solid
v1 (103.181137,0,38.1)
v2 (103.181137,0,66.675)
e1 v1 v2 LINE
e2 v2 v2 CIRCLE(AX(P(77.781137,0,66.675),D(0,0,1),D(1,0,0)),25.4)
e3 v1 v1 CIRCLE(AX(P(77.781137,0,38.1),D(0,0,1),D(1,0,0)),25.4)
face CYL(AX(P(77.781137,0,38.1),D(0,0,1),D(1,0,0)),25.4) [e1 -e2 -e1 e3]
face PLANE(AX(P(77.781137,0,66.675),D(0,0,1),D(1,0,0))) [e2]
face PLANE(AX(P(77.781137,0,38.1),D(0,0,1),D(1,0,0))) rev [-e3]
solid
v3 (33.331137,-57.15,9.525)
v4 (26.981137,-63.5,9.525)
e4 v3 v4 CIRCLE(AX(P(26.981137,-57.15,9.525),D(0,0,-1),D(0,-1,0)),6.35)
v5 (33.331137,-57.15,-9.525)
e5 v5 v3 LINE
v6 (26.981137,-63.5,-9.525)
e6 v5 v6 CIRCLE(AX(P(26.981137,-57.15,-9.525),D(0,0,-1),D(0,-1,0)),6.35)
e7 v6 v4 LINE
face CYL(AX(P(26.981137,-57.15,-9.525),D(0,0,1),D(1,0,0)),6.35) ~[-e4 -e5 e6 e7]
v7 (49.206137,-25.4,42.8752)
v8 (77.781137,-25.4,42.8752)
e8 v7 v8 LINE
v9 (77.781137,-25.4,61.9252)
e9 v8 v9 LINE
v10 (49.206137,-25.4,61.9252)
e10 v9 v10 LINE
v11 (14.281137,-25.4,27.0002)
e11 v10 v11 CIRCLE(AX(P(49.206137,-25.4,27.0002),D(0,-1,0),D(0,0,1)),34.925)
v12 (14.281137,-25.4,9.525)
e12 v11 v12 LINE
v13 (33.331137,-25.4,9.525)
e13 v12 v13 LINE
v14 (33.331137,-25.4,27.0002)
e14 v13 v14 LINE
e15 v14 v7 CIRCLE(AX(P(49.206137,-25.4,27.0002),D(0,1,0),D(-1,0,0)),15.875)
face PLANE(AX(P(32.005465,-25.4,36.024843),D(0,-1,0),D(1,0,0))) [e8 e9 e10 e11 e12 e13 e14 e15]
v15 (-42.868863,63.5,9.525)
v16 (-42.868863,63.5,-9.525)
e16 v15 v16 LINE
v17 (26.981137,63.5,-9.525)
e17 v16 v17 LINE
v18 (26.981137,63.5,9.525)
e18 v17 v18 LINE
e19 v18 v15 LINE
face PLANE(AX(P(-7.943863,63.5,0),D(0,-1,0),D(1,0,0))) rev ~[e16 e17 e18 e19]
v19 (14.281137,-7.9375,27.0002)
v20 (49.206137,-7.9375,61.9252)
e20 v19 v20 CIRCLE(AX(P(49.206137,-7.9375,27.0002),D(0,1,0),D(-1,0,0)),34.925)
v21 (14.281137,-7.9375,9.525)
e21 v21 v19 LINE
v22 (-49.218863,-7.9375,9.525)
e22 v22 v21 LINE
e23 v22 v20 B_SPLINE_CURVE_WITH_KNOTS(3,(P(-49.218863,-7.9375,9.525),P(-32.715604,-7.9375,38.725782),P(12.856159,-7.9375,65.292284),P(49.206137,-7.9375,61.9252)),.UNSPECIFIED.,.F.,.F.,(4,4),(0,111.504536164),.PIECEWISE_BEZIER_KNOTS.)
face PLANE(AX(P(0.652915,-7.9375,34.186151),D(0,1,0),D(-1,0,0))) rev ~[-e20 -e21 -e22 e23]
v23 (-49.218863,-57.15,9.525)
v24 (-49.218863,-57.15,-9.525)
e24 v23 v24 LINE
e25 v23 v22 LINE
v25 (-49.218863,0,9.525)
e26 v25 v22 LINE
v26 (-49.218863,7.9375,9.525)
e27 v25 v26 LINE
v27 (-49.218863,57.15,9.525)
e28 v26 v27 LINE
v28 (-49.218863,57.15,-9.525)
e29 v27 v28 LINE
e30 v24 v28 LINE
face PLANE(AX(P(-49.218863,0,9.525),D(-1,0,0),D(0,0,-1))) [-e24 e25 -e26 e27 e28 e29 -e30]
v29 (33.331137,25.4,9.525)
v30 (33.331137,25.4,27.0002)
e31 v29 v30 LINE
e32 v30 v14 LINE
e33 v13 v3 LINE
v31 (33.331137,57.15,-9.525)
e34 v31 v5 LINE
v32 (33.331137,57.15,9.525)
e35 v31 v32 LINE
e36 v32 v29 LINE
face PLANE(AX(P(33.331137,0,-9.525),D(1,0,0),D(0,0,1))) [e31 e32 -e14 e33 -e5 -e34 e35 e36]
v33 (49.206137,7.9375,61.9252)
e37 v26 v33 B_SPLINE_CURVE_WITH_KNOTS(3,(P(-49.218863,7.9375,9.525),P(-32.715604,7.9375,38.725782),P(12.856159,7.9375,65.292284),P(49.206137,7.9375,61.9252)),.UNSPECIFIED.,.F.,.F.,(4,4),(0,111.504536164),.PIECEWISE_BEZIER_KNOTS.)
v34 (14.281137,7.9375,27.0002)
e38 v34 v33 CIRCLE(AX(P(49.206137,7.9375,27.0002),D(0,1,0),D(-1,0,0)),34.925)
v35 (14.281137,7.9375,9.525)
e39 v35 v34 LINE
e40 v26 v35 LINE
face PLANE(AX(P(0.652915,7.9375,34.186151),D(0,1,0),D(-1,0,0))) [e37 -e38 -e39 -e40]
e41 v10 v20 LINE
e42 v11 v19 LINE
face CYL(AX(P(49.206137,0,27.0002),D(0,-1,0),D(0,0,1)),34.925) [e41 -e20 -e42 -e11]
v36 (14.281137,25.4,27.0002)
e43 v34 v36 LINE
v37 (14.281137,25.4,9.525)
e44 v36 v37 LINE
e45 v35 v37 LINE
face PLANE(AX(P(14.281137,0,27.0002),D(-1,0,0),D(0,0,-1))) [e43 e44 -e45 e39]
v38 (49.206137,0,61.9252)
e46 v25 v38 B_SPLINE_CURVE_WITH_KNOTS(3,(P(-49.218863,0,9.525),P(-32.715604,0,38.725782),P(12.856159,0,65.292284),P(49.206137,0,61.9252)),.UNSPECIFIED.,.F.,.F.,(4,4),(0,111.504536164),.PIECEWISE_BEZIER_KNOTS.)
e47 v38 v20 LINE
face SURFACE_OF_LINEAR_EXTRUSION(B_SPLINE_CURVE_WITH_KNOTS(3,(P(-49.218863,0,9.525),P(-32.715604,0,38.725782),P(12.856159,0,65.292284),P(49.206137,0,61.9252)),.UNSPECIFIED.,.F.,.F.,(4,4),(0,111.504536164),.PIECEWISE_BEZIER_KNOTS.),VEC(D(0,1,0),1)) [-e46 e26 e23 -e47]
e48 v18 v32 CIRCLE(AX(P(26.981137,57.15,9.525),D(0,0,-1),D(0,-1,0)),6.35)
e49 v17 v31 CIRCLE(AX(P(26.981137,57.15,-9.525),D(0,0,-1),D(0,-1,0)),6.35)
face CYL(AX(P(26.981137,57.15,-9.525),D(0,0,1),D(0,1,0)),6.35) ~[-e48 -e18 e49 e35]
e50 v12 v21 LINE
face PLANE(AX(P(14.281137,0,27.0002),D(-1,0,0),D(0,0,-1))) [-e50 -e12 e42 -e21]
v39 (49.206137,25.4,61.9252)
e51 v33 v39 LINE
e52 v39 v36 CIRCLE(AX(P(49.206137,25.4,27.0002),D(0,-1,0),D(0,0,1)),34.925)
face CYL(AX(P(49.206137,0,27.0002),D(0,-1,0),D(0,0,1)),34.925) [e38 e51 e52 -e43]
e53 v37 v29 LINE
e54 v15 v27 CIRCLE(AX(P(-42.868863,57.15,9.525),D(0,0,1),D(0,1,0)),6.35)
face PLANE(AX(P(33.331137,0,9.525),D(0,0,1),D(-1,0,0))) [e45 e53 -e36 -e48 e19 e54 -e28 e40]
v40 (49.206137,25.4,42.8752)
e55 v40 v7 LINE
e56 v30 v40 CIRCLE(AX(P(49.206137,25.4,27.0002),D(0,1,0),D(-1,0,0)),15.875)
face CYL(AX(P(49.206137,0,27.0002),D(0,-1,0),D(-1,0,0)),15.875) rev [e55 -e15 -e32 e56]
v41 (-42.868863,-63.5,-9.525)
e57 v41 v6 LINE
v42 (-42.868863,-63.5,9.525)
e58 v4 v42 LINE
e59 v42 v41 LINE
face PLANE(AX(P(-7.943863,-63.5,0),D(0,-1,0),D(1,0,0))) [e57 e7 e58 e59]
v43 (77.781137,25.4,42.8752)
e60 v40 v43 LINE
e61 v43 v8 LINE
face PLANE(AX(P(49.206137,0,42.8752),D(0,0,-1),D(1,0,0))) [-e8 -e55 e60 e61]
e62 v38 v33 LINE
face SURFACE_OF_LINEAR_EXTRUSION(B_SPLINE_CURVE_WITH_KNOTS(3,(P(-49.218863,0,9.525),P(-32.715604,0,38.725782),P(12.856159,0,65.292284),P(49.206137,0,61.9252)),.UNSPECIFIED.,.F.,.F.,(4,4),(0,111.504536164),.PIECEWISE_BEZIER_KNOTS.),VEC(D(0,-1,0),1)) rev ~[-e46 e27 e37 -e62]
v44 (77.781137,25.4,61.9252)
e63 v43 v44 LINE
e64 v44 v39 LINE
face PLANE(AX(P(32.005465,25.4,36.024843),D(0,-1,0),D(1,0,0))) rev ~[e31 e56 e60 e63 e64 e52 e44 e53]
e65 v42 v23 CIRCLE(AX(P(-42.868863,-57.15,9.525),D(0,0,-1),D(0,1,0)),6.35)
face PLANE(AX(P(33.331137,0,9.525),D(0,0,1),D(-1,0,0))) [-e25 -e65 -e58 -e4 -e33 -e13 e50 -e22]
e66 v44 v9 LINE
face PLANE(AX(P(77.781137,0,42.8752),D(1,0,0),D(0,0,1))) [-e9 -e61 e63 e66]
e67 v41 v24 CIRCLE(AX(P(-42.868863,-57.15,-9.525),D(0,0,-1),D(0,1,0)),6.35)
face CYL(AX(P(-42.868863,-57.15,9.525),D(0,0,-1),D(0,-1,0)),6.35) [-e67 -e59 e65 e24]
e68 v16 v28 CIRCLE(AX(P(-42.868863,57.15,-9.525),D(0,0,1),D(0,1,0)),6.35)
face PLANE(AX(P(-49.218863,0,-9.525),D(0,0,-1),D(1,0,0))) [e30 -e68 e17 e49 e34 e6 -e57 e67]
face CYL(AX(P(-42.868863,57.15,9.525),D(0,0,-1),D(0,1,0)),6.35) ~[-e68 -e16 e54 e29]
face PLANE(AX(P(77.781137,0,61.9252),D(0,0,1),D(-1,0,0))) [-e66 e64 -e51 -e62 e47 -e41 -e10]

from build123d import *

# Parameters (mm, degrees)
F1_DEPTH = 63.5
F0_W     = 25.4
F0_H     = 19.05
F2_DEPTH = 25.4
F3_DEPTH = 7.9375
F5_R     = 6.35


with BuildPart() as f1:
    # F0 (on Front) → F1 (new body, symmetric)
    with BuildSketch(Plane.XZ):
        Polygon((-49.2188632803, -9.525), (33.3311367197, -9.525), (33.3311367197, 9.525), (14.2811367197, 9.525), (-49.2188632803, 9.525), align=None)
    extrude(amount=F1_DEPTH, both=True)

    # F0 (on Front) → F2 (join, symmetric)
    with BuildSketch(Plane.XZ):
        with BuildLine():
            Line((14.2811367197, 9.525), (33.3311367197, 9.525))
            Line((33.3311367197, 9.525), (33.3311367197, 27.0002))
            ThreePointArc((33.3311367197, 27.0002), (37.9808165684, 38.2255201513), (49.2061367197, 42.8752))
            Line((49.2061367197, 42.8752), (52.3811367197, 42.8752))
            Line((52.3811367197, 42.8752), (52.3811367197, 61.9252))
            Line((52.3811367197, 61.9252), (49.2061367197, 61.9252))
            ThreePointArc((49.2061367197, 61.9252), (24.5104323868, 51.6959043329), (14.2811367197, 27.0002))
            Line((14.2811367197, 27.0002), (14.2811367197, 9.525))
        make_face()
        with Locations((65.0811367197, 52.4002)):
            Rectangle(F0_W, F0_H)
    extrude(amount=F2_DEPTH, both=True)

    # F0 (on Front) → F3 (join, symmetric)
    with BuildSketch(Plane.XZ):
        with BuildLine():
            add(Edge.make_bspline(
                [(-49.2188632803, 9.525), (-32.7156037092, 38.7257821858), (12.8561593592, 65.2922838926), (49.2061367197, 61.9252)],
                knots=[0, 0, 0, 0, 111.5045361635, 111.5045361635, 111.5045361635, 111.5045361635], degree=3))
            Line((-49.2188632803, 9.525), (14.2811367197, 9.525))
            Line((14.2811367197, 9.525), (14.2811367197, 27.0002))
            ThreePointArc((14.2811367197, 27.0002), (24.5104323868, 51.6959043329), (49.2061367197, 61.9252))
        make_face()
    extrude(amount=F3_DEPTH, both=True)

    # F5
    f5_edges = [f1.edges().sort_by_distance(p)[0] for p in [
        (-49.218863, -63.5, 0),
        (33.331137, -63.5, 0),
        (33.331137, 63.5, 0),
        (-49.218863, 63.5, 0),
    ]]
    fillet(f5_edges, radius=F5_R)


with BuildPart() as f4:
    # F0 (on Front) → F4 (revolve)
    with BuildSketch(Plane.XZ):
        Polygon((77.7811367197, 66.675), (77.7811367197, 61.9252), (77.7811367197, 42.8752), (77.7811367197, 38.1), (103.1811367197, 38.1), (103.1811367197, 66.675), align=None)
    revolve(axis=Axis((77.7811367197, 0, 52.3875), (0, 0, 1)))


solid = Compound([f1.part, f4.part])
